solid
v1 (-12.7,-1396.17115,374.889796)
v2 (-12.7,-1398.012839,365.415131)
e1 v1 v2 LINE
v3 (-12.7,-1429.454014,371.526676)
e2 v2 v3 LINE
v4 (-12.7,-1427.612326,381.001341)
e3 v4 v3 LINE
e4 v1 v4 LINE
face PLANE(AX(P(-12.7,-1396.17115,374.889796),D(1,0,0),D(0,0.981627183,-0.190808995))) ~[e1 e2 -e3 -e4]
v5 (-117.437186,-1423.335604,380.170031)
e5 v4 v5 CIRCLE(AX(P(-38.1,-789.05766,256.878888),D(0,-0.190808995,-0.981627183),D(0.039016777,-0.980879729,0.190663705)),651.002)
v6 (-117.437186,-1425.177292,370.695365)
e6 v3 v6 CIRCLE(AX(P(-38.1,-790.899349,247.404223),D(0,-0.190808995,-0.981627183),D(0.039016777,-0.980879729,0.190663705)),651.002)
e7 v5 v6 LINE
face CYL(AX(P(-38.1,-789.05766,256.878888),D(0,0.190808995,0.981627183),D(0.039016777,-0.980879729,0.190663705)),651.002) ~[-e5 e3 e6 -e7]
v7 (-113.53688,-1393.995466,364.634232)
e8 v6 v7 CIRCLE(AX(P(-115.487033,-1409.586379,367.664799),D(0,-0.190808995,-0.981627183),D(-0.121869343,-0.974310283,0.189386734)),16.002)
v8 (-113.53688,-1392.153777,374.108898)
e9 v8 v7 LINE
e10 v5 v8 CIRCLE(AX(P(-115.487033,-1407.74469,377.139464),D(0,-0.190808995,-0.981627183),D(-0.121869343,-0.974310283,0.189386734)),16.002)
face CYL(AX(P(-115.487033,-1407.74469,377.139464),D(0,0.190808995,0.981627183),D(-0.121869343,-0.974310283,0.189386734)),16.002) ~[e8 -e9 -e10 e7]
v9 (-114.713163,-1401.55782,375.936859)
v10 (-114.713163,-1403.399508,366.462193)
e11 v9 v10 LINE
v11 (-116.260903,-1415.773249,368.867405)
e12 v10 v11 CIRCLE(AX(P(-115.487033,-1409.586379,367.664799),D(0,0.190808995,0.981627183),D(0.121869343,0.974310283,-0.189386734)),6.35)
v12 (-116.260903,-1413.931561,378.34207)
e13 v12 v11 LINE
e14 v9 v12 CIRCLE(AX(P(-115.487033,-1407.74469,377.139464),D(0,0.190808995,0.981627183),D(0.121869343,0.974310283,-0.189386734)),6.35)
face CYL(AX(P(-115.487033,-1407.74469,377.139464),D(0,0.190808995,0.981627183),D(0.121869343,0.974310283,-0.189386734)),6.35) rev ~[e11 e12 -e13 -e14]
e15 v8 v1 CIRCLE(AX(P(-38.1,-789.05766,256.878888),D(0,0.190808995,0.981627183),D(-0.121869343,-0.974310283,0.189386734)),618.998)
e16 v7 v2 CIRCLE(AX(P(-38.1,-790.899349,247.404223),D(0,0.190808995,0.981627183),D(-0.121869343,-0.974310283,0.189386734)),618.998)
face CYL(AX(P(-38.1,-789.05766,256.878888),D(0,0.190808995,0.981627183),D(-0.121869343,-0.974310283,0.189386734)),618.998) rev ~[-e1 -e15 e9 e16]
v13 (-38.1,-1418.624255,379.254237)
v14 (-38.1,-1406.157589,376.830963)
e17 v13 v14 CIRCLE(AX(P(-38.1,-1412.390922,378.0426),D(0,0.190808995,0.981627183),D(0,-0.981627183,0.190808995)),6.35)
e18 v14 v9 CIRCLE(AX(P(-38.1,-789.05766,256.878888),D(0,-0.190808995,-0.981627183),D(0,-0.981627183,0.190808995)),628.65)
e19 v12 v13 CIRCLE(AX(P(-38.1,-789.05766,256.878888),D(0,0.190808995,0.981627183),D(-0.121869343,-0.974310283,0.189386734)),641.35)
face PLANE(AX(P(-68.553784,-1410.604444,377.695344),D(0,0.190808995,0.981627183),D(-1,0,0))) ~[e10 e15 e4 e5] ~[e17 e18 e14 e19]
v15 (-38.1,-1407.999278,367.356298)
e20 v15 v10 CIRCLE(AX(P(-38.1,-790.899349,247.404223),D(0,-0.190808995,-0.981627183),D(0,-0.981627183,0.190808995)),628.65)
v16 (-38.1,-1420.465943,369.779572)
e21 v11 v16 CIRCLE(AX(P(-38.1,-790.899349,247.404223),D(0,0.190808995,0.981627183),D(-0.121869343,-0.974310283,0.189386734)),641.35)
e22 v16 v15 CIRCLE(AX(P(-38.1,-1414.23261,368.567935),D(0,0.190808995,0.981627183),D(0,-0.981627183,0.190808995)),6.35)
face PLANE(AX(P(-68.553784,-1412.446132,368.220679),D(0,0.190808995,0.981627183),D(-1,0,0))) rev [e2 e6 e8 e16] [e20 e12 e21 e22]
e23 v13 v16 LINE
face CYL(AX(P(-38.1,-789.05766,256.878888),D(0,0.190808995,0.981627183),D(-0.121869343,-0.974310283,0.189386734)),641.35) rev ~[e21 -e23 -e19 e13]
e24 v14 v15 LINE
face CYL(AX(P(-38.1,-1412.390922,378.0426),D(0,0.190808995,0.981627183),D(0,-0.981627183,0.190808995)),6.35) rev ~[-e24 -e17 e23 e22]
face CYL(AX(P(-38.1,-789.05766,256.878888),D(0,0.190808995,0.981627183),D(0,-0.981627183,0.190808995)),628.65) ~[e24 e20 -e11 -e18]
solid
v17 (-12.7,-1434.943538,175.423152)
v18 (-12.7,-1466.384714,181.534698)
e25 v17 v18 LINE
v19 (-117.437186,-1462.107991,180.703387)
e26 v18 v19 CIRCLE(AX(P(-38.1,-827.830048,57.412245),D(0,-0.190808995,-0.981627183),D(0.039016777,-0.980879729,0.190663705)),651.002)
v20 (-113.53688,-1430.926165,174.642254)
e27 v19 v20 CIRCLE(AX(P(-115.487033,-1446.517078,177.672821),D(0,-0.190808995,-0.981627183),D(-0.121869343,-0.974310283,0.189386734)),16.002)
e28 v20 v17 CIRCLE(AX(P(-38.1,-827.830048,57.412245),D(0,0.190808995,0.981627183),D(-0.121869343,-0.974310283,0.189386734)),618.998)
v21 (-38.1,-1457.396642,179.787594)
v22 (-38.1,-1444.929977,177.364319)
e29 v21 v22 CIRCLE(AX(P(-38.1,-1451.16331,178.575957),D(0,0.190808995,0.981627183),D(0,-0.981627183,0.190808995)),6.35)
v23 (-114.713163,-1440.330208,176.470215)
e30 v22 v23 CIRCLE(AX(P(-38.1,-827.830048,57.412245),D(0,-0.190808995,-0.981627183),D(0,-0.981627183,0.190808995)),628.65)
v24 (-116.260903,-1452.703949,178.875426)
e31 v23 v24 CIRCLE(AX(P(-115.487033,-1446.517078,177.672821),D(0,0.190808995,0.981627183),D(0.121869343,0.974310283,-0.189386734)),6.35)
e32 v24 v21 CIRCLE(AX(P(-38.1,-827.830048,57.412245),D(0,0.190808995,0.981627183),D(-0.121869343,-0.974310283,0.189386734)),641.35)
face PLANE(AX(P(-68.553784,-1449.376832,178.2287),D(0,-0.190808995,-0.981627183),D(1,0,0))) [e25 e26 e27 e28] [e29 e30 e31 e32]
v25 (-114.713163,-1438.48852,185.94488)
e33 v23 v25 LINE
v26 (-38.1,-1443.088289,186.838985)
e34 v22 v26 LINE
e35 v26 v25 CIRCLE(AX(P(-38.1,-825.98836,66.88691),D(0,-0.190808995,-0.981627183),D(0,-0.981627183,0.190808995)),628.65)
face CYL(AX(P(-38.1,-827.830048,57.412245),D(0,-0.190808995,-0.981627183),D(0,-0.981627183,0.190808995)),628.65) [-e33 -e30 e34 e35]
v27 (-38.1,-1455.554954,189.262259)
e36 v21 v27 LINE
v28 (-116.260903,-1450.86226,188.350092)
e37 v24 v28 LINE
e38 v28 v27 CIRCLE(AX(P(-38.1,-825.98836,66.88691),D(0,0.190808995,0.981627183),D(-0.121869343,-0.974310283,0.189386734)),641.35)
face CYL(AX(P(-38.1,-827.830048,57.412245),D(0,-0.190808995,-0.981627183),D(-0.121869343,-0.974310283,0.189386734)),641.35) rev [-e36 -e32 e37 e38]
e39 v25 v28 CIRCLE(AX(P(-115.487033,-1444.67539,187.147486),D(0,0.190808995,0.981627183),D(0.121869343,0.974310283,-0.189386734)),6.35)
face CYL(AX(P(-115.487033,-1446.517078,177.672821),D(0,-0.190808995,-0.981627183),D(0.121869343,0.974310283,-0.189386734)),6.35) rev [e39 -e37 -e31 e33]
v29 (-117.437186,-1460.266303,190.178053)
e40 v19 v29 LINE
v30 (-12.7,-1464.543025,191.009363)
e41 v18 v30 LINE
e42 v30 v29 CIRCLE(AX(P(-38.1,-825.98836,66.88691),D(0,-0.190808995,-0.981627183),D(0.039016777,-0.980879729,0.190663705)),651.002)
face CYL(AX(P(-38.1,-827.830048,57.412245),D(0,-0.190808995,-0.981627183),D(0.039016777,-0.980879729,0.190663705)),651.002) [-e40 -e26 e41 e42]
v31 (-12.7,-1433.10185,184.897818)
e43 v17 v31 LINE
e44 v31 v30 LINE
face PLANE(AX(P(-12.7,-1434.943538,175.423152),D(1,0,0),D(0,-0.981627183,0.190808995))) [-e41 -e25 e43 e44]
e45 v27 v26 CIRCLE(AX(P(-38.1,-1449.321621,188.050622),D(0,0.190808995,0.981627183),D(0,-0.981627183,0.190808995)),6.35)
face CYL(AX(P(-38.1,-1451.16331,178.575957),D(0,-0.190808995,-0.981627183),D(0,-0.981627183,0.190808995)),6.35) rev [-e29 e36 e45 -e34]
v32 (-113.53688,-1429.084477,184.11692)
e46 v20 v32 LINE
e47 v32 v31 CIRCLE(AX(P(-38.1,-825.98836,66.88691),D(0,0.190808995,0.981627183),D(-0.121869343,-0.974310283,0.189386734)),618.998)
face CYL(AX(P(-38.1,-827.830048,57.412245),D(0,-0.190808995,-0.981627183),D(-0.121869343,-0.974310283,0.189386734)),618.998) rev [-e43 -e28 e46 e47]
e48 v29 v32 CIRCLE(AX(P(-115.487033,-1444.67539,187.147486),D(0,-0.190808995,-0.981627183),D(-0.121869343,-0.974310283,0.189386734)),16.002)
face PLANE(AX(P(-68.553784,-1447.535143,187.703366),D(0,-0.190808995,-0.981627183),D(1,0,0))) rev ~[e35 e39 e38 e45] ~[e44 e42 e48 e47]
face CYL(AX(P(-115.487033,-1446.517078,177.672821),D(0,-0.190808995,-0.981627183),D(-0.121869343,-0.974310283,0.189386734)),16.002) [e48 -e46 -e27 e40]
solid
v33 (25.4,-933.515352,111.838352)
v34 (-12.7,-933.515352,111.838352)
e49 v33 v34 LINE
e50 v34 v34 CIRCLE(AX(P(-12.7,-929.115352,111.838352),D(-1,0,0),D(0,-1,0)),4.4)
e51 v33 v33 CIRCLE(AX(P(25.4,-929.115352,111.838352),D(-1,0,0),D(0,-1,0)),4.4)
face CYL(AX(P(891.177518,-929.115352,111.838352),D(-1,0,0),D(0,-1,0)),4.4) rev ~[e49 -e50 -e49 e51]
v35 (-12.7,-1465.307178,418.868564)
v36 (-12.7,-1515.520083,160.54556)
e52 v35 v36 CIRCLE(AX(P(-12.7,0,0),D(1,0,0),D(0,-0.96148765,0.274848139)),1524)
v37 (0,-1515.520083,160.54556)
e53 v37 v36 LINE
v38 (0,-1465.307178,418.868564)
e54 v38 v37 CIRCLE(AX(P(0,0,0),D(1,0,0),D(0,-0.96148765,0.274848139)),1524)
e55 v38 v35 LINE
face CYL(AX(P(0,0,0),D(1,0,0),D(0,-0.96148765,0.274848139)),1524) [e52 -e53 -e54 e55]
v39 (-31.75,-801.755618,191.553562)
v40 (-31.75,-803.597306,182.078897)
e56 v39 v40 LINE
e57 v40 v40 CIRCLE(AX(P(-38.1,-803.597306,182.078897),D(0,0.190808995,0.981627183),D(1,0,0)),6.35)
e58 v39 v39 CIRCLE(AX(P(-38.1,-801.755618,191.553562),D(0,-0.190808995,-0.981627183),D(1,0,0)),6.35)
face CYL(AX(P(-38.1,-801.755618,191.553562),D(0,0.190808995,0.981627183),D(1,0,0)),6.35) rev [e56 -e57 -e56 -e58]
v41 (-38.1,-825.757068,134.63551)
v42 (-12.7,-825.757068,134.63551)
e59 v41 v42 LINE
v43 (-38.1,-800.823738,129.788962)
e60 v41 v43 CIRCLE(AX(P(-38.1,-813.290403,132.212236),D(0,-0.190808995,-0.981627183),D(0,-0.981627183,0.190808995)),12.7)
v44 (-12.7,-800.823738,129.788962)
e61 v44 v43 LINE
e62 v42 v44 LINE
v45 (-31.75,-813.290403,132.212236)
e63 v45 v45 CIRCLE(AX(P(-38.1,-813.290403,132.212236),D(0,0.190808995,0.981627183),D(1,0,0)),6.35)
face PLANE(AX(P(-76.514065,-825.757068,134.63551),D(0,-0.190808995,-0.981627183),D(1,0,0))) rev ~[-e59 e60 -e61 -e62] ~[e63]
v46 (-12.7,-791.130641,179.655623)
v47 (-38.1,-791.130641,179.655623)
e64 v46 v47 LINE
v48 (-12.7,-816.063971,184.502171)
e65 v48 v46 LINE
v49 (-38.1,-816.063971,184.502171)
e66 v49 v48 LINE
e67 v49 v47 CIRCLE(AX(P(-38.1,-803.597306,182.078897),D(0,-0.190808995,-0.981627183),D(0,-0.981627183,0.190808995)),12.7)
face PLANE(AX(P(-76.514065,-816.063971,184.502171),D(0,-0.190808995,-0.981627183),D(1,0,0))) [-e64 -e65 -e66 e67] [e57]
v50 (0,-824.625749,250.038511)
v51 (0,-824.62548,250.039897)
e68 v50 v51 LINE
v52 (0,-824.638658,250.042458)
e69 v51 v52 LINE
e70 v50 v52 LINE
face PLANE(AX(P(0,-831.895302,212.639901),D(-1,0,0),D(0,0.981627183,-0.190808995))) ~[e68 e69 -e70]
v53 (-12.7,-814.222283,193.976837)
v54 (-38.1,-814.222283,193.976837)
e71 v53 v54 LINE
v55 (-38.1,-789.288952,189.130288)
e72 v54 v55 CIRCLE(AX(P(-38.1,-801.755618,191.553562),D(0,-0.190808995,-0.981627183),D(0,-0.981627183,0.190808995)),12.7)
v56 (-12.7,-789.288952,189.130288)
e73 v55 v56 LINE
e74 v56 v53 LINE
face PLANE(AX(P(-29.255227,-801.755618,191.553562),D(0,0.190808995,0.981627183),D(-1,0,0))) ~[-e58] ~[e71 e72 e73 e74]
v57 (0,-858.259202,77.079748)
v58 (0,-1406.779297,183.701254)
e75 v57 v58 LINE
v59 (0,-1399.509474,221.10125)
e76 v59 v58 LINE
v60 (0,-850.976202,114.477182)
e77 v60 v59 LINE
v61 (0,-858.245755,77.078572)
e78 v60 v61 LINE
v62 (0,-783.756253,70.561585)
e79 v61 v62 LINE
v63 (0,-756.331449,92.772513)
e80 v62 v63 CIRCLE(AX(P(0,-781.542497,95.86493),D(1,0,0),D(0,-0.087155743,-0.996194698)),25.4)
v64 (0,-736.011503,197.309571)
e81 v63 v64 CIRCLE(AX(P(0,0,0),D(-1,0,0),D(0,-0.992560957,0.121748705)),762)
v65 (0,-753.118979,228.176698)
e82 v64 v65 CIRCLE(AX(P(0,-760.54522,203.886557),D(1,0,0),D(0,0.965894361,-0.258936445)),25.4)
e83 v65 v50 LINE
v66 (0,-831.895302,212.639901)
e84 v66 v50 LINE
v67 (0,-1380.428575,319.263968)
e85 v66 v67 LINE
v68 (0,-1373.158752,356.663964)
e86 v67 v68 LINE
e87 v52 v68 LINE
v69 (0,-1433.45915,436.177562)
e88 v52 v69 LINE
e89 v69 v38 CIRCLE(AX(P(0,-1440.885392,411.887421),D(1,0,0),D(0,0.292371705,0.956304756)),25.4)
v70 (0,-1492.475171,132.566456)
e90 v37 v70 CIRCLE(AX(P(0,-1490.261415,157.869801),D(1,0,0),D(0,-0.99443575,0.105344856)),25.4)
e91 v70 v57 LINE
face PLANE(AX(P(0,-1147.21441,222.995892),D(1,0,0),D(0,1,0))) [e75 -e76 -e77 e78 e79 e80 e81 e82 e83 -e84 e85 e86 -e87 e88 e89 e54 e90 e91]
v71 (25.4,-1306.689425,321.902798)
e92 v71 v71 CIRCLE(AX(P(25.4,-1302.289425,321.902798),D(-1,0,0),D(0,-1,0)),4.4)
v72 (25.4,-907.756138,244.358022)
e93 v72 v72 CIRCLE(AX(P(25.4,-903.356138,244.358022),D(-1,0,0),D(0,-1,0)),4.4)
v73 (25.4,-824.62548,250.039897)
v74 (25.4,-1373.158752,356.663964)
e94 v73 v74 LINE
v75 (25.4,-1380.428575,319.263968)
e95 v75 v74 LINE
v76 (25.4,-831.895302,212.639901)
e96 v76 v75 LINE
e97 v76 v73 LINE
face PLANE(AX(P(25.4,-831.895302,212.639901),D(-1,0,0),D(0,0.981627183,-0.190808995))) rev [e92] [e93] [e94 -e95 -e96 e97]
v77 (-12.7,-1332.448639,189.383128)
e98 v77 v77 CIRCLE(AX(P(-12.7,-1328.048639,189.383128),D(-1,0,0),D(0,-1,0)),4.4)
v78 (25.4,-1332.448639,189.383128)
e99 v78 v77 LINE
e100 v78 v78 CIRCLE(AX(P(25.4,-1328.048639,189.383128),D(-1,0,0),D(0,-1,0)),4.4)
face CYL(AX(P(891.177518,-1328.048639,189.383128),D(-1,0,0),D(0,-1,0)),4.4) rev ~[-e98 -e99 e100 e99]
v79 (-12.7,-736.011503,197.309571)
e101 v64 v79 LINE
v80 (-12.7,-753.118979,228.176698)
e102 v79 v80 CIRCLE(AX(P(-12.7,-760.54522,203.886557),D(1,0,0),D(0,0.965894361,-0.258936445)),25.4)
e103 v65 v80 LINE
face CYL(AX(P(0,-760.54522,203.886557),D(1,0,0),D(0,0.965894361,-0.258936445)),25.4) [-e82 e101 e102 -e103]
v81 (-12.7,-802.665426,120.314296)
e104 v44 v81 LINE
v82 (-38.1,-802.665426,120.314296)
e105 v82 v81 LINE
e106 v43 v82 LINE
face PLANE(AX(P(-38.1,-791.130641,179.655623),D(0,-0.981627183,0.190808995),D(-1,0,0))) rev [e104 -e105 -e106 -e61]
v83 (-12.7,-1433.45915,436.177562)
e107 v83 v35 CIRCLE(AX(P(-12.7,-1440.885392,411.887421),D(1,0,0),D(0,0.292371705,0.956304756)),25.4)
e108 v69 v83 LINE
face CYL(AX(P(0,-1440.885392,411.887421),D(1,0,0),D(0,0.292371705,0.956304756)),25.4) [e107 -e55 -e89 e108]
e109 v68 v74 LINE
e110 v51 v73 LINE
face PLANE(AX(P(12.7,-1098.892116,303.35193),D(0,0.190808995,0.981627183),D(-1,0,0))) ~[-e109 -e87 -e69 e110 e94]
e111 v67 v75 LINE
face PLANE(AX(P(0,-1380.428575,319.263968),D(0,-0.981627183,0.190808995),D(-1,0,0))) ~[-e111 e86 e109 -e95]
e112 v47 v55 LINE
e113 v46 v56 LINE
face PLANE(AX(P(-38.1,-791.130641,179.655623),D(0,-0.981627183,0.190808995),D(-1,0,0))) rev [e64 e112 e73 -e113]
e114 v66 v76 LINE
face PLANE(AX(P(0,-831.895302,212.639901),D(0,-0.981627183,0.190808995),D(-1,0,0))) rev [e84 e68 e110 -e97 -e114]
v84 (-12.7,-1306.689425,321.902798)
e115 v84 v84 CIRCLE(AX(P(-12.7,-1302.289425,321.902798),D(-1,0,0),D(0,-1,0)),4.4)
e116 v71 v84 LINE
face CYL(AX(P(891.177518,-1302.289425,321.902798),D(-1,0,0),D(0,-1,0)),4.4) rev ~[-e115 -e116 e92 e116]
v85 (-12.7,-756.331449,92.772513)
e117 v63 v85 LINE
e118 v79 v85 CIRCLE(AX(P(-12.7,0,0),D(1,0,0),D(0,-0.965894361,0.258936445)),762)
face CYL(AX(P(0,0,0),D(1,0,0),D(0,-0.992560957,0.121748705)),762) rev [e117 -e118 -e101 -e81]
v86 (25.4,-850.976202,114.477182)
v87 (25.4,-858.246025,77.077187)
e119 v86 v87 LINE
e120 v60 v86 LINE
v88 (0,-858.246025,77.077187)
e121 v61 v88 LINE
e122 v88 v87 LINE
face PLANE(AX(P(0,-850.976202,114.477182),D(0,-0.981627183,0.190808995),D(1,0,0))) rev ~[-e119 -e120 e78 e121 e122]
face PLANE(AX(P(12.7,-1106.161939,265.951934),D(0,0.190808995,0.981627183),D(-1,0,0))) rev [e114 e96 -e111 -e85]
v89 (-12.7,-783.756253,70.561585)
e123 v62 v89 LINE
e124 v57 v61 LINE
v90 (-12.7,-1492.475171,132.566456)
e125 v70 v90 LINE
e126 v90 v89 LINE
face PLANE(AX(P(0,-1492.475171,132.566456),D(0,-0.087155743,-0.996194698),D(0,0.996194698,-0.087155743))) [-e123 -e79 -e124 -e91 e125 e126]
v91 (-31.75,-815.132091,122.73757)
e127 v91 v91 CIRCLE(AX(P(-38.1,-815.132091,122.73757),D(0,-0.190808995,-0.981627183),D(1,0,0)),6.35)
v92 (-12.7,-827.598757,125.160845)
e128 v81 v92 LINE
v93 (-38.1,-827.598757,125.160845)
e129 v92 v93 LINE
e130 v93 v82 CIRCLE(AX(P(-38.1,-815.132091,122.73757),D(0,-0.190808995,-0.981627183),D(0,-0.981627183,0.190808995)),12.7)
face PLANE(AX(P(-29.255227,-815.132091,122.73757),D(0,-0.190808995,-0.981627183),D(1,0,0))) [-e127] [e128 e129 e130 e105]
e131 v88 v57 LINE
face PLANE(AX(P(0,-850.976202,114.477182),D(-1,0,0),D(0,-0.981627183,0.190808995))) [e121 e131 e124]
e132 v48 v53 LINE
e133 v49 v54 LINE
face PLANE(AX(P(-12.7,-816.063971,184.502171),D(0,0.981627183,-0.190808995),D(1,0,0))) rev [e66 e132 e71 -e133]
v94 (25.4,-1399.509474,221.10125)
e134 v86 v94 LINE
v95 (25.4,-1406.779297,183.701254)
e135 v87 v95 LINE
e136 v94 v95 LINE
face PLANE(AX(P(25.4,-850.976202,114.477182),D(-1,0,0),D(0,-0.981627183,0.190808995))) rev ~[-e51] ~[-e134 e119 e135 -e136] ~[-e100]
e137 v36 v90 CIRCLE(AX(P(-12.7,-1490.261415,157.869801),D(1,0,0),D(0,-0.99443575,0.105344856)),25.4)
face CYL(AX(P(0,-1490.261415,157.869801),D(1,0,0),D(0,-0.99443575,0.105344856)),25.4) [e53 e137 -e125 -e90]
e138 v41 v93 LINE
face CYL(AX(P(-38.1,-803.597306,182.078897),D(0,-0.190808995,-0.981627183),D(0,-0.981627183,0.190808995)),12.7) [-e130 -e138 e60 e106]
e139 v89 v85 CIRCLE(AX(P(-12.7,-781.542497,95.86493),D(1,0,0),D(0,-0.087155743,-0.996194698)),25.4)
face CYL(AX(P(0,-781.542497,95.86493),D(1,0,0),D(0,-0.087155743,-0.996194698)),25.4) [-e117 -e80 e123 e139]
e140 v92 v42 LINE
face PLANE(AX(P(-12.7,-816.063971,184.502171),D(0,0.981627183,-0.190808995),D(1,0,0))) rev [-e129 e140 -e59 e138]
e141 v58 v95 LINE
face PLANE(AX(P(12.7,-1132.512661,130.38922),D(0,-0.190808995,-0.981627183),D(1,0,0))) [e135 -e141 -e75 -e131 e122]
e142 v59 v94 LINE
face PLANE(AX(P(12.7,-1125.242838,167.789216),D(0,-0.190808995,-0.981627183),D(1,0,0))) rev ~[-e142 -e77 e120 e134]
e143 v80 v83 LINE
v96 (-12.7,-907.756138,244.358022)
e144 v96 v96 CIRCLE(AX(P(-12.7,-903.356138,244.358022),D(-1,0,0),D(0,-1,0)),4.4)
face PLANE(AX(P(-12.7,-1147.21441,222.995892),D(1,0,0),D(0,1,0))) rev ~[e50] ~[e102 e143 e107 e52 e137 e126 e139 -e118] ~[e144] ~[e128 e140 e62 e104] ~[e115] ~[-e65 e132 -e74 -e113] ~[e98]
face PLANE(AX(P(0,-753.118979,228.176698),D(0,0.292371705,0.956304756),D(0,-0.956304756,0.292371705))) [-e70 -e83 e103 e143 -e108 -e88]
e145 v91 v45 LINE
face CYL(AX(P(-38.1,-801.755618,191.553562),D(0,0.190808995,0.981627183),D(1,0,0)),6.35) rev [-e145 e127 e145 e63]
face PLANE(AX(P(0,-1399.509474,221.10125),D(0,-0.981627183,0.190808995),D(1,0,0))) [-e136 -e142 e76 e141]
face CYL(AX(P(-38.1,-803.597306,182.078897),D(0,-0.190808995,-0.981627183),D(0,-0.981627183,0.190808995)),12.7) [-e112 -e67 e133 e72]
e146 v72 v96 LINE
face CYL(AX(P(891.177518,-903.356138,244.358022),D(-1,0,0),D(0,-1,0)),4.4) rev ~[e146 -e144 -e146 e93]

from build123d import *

# Parameters (mm, degrees)
F1_DEPTH  = 12.7
F4_DEPTH  = 25.4
F7_DEPTH  = 9.652
F10_DEPTH = 9.652
F11_R     = 6.35
F12_DEPTH = 25.4
F13_W     = 63.8140652657
F13_H     = 50.8
F14_DEPTH = 101.1923770612
F17_W     = 25.4
F17_H     = 558.8000023101
F18_DEPTH = 38.1
F21_D     = 8.8


# Not quite as in the source:
# - a feature of the source that left no trace in its solid (it failed there, or was rolled back) is left out
# - a pattern or mirror of a feature is missing from the dataset's text; its kind, count and spacing are read off the source's solid


with BuildPart() as f1:
    # F0 (on Right) → F1 (new body)
    with BuildSketch(Plane.YZ):
        with BuildLine():
            ThreePointArc((-756.3314490517, 92.7725130381), (-747.9999137871, 145.3964544769), (-736.0115033336, 197.3095713861))
            ThreePointArc((-736.0115033336, 197.3095713861), (-738.3291312366, 216.1993713631), (-753.1189788115, 228.1766979004))
            Line((-753.1189788115, 228.1766979004), (-1433.4591504296, 436.1775621929))
            ThreePointArc((-1433.4591504296, 436.1775621929), (-1453.0143855451, 434.2043994356), (-1465.30717803, 418.8685641269))
            ThreePointArc((-1465.30717803, 418.8685641269), (-1495.9998275742, 290.7929089539), (-1515.5200833468, 160.5455604257))
            ThreePointArc((-1515.5200833468, 160.5455604257), (-1509.8673096495, 141.7214604148), (-1492.4751711568, 132.5664557537))
            Line((-1492.4751711568, 132.5664557537), (-783.7562532192, 70.5615848078))
            ThreePointArc((-783.7562532192, 70.5615848078), (-765.5565598439, 76.1263941769), (-756.3314490517, 92.7725130381))
        make_face()
        with BuildLine():
            ThreePointArc((-868.3901696878, 137.4879790683), (-863.196533516, 167.7279226013), (-856.9770599652, 197.7736575783))
            ThreePointArc((-856.9770599652, 197.7736575783), (-841.8007632153, 207.3788653824), (-832.1955554113, 192.2025686325))
            ThreePointArc((-832.1955554113, 192.2025686325), (-838.239832524, 163.0031923871), (-843.2871690853, 133.6150782495))
            ThreePointArc((-843.2871690853, 133.6150782495), (-857.775119796, 123.0000283577), (-868.3901696878, 137.4879790683))
        make_face(mode=Mode.SUBTRACT)
        with BuildLine():
            ThreePointArc((-1392.344253737, 220.5256653672), (-1383.7998405062, 268.9834407823), (-1373.5694803277, 317.1135013085))
            ThreePointArc((-1373.5694803277, 317.1135013085), (-1358.3381021148, 326.6311227412), (-1348.8204806822, 311.3997445282))
            ThreePointArc((-1348.8204806822, 311.3997445282), (-1358.8665100466, 264.1368922998), (-1367.2569698858, 216.5522299552))
            ThreePointArc((-1367.2569698858, 216.5522299552), (-1381.7873295174, 205.9953057356), (-1392.344253737, 220.5256653672))
        make_face(mode=Mode.SUBTRACT)
        with BuildLine():
            ThreePointArc((-1348.8204806822, 311.3997445282), (-1358.3381021148, 326.6311227412), (-1373.5694803277, 317.1135013085))
            ThreePointArc((-1373.5694803277, 317.1135013085), (-1383.7998405062, 268.9834407823), (-1392.344253737, 220.5256653672))
            ThreePointArc((-1392.344253737, 220.5256653672), (-1381.7873295174, 205.9953057356), (-1367.2569698858, 216.5522299552))
            ThreePointArc((-1367.2569698858, 216.5522299552), (-1358.8665100466, 264.1368922998), (-1348.8204806822, 311.3997445282))
        make_face()
        with BuildLine():
            ThreePointArc((-832.1955554113, 192.2025686325), (-841.8007632153, 207.3788653824), (-856.9770599652, 197.7736575783))
            ThreePointArc((-856.9770599652, 197.7736575783), (-863.196533516, 167.7279226013), (-868.3901696878, 137.4879790683))
            ThreePointArc((-868.3901696878, 137.4879790683), (-857.775119796, 123.0000283577), (-843.2871690853, 133.6150782495))
            ThreePointArc((-843.2871690853, 133.6150782495), (-838.239832524, 163.0031923871), (-832.1955554113, 192.2025686325))
        make_face()
    extrude(amount=-F1_DEPTH)

    # F3 (on face) → F4 (join, symmetric)
    with BuildSketch(Plane(origin=(0, 0, 0), x_dir=(1, 0, 0), z_dir=(0, -0.1908089954, -0.9816271834))):
        with BuildLine():
            ThreePointArc((-38.1, 829.9252514334), (-33.6098719395, 828.0653794939), (-31.75, 823.5752514334))
            ThreePointArc((-31.75, 823.5752514334), (-33.6098719395, 819.0851233729), (-38.1, 817.2252514334))
            Line((-38.1, 817.2252514334), (-38.1, 810.8752514334))
            ThreePointArc((-38.1, 810.8752514334), (-29.1197438789, 814.5949953123), (-25.4, 823.5752514334))
            ThreePointArc((-25.4, 823.5752514334), (-29.1197438789, 832.5555075545), (-38.1, 836.2752514334))
            Line((-38.1, 836.2752514334), (-38.1, 829.9252514334))
        make_face()
        with BuildLine():
            ThreePointArc((-38.1, 817.2252514334), (-44.45, 823.5752514334), (-38.1, 829.9252514334))
            Line((-38.1, 829.9252514334), (-38.1, 836.2752514334))
            ThreePointArc((-38.1, 836.2752514334), (-50.8, 823.5752514334), (-38.1, 810.8752514334))
            Line((-38.1, 810.8752514334), (-38.1, 817.2252514334))
        make_face()
        with BuildLine():
            Line((-12.7, 836.2752514334), (-38.1, 836.2752514334))
            ThreePointArc((-38.1, 836.2752514334), (-29.1197438789, 832.5555075545), (-25.4, 823.5752514334))
            ThreePointArc((-25.4, 823.5752514334), (-29.1197438789, 814.5949953123), (-38.1, 810.8752514334))
            Line((-38.1, 810.8752514334), (-12.7, 810.8752514334))
            Line((-12.7, 810.8752514334), (-12.7, 836.2752514334))
        make_face()
    extrude(amount=F4_DEPTH, both=True)

    # F9 (on face) → F10 (join)
    with BuildSketch(Plane(origin=(0, -4.8465484826, -24.9333304596), x_dir=(1, 0, 0), z_dir=(0, -0.1908089954, -0.9816271834))):
        with BuildLine():
            Line((-12.7, 810.8752514334), (-12.7, 836.2752514334))
            Line((-12.7, 836.2752514334), (-38.1, 836.2752514334))
            ThreePointArc((-38.1, 836.2752514334), (-50.8, 823.5752514334), (-38.1, 810.8752514334))
            Line((-38.1, 810.8752514334), (-12.7, 810.8752514334))
        make_face()
    f10 = extrude(amount=F10_DEPTH)

    # F10_copies: F10 across plane
    add(f10.mirror(Plane(origin=(0, 0, 0), x_dir=(0, 0.9816271834, -0.1908089954), z_dir=(0, 0.1908089954, 0.9816271834))))

    # F11 (on face) → F12 (cut)
    with BuildSketch(Plane(origin=(0, -6.6882369059, -34.4079960342), x_dir=(1, 0, 0), z_dir=(0, -0.1908089954, -0.9816271834))):
        with Locations((-38.1, 823.5752514334)):
            Circle(F11_R)
    f12 = extrude(amount=-F12_DEPTH, mode=Mode.SUBTRACT)

    # F12_copies: F12 across plane
    add(f12.mirror(Plane(origin=(0, 0, 0), x_dir=(0, 0.9816271834, -0.1908089954), z_dir=(0, 0.1908089954, 0.9816271834))), mode=Mode.SUBTRACT)

    # F13 (on face) → F14 (cut, through all)
    with BuildSketch(Plane(origin=(0, -820.9105196516, 159.5688405843), x_dir=(1, 0, 0), z_dir=(0, -0.9816271834, 0.1908089954))):
        with Locations((-44.6070326328, 0)):
            Rectangle(F13_W, F13_H)
    extrude(amount=-F14_DEPTH, mode=Mode.SUBTRACT)

    # F17 (on face) → F18 (join)
    with BuildSketch(Plane(origin=(0, -9.5404497688, -49.0813591724), x_dir=(1, 0, 0), z_dir=(0, -0.1908089954, -0.9816271834))):
        with Locations((12.7, 1136.5846496688)):
            Rectangle(F17_W, F17_H)
    f18 = extrude(amount=F18_DEPTH)

    # F18_copies: F18 across plane
    add(f18.mirror(Plane(origin=(0, 0, 0), x_dir=(0, 0.9816271834, -0.1908089954), z_dir=(0, 0.1908089954, 0.9816271834))))

    # F21 (through all)
    with Locations(Plane.YZ.offset(25.4)):
        with Locations((-929.1153519156, 111.8383524205), (-1328.0486392687, 189.3831281415), (-1302.2894248929, 321.9027979069), (-903.3561375398, 244.3580221859)):
            Hole(F21_D / 2)


with BuildPart() as f7:
    # F6 (on face) → F7 (new body)
    with BuildSketch(Plane(origin=(0, -19.3861939303, -99.7333218383), x_dir=(1, 0, 0), z_dir=(0, -0.1908089954, -0.9816271834))):
        with BuildLine():
            Line((-12.7, 1458.0670480707), (-12.7, 1474.0815496381))
            ThreePointArc((-12.7, 1474.0815496381), (-65.1564294406, 1474.0147594815), (-117.4371862954, 1469.7247812442))
            ThreePointArc((-117.4371862954, 1469.7247812442), (-131.3697565808, 1451.8919044925), (-113.5368798291, 1437.9593342071))
            ThreePointArc((-113.5368798291, 1437.9593342071), (-63.2019841466, 1442.064066527), (-12.7, 1442.0518993386))
            Line((-12.7, 1442.0518993386), (-12.7, 1458.0670480707))
        make_face()
        with BuildLine():
            ThreePointArc((-38.1, 1464.9252514334), (-31.75, 1458.5752514334), (-38.1, 1452.2252514334))
            ThreePointArc((-38.1, 1452.2252514334), (-76.4781643786, 1451.0526924613), (-114.7131627316, 1447.5393896627))
            ThreePointArc((-114.7131627316, 1447.5393896627), (-121.7897011252, 1453.068187395), (-116.2609033929, 1460.1447257886))
            ThreePointArc((-116.2609033929, 1460.1447257886), (-77.2534808307, 1463.7290044013), (-38.1, 1464.9252514334))
        make_face(mode=Mode.SUBTRACT)
    extrude(amount=-F7_DEPTH)


with BuildPart() as f7_copies_1:
    # F7_copies: instance of F7
    add(f7.part.mirror(Plane(origin=(0, 0, 0), x_dir=(0, 0.9816271834, -0.1908089954), z_dir=(0, 0.1908089954, 0.9816271834))))


solid = Compound([f1.part, f7.part, f7_copies_1.part])
